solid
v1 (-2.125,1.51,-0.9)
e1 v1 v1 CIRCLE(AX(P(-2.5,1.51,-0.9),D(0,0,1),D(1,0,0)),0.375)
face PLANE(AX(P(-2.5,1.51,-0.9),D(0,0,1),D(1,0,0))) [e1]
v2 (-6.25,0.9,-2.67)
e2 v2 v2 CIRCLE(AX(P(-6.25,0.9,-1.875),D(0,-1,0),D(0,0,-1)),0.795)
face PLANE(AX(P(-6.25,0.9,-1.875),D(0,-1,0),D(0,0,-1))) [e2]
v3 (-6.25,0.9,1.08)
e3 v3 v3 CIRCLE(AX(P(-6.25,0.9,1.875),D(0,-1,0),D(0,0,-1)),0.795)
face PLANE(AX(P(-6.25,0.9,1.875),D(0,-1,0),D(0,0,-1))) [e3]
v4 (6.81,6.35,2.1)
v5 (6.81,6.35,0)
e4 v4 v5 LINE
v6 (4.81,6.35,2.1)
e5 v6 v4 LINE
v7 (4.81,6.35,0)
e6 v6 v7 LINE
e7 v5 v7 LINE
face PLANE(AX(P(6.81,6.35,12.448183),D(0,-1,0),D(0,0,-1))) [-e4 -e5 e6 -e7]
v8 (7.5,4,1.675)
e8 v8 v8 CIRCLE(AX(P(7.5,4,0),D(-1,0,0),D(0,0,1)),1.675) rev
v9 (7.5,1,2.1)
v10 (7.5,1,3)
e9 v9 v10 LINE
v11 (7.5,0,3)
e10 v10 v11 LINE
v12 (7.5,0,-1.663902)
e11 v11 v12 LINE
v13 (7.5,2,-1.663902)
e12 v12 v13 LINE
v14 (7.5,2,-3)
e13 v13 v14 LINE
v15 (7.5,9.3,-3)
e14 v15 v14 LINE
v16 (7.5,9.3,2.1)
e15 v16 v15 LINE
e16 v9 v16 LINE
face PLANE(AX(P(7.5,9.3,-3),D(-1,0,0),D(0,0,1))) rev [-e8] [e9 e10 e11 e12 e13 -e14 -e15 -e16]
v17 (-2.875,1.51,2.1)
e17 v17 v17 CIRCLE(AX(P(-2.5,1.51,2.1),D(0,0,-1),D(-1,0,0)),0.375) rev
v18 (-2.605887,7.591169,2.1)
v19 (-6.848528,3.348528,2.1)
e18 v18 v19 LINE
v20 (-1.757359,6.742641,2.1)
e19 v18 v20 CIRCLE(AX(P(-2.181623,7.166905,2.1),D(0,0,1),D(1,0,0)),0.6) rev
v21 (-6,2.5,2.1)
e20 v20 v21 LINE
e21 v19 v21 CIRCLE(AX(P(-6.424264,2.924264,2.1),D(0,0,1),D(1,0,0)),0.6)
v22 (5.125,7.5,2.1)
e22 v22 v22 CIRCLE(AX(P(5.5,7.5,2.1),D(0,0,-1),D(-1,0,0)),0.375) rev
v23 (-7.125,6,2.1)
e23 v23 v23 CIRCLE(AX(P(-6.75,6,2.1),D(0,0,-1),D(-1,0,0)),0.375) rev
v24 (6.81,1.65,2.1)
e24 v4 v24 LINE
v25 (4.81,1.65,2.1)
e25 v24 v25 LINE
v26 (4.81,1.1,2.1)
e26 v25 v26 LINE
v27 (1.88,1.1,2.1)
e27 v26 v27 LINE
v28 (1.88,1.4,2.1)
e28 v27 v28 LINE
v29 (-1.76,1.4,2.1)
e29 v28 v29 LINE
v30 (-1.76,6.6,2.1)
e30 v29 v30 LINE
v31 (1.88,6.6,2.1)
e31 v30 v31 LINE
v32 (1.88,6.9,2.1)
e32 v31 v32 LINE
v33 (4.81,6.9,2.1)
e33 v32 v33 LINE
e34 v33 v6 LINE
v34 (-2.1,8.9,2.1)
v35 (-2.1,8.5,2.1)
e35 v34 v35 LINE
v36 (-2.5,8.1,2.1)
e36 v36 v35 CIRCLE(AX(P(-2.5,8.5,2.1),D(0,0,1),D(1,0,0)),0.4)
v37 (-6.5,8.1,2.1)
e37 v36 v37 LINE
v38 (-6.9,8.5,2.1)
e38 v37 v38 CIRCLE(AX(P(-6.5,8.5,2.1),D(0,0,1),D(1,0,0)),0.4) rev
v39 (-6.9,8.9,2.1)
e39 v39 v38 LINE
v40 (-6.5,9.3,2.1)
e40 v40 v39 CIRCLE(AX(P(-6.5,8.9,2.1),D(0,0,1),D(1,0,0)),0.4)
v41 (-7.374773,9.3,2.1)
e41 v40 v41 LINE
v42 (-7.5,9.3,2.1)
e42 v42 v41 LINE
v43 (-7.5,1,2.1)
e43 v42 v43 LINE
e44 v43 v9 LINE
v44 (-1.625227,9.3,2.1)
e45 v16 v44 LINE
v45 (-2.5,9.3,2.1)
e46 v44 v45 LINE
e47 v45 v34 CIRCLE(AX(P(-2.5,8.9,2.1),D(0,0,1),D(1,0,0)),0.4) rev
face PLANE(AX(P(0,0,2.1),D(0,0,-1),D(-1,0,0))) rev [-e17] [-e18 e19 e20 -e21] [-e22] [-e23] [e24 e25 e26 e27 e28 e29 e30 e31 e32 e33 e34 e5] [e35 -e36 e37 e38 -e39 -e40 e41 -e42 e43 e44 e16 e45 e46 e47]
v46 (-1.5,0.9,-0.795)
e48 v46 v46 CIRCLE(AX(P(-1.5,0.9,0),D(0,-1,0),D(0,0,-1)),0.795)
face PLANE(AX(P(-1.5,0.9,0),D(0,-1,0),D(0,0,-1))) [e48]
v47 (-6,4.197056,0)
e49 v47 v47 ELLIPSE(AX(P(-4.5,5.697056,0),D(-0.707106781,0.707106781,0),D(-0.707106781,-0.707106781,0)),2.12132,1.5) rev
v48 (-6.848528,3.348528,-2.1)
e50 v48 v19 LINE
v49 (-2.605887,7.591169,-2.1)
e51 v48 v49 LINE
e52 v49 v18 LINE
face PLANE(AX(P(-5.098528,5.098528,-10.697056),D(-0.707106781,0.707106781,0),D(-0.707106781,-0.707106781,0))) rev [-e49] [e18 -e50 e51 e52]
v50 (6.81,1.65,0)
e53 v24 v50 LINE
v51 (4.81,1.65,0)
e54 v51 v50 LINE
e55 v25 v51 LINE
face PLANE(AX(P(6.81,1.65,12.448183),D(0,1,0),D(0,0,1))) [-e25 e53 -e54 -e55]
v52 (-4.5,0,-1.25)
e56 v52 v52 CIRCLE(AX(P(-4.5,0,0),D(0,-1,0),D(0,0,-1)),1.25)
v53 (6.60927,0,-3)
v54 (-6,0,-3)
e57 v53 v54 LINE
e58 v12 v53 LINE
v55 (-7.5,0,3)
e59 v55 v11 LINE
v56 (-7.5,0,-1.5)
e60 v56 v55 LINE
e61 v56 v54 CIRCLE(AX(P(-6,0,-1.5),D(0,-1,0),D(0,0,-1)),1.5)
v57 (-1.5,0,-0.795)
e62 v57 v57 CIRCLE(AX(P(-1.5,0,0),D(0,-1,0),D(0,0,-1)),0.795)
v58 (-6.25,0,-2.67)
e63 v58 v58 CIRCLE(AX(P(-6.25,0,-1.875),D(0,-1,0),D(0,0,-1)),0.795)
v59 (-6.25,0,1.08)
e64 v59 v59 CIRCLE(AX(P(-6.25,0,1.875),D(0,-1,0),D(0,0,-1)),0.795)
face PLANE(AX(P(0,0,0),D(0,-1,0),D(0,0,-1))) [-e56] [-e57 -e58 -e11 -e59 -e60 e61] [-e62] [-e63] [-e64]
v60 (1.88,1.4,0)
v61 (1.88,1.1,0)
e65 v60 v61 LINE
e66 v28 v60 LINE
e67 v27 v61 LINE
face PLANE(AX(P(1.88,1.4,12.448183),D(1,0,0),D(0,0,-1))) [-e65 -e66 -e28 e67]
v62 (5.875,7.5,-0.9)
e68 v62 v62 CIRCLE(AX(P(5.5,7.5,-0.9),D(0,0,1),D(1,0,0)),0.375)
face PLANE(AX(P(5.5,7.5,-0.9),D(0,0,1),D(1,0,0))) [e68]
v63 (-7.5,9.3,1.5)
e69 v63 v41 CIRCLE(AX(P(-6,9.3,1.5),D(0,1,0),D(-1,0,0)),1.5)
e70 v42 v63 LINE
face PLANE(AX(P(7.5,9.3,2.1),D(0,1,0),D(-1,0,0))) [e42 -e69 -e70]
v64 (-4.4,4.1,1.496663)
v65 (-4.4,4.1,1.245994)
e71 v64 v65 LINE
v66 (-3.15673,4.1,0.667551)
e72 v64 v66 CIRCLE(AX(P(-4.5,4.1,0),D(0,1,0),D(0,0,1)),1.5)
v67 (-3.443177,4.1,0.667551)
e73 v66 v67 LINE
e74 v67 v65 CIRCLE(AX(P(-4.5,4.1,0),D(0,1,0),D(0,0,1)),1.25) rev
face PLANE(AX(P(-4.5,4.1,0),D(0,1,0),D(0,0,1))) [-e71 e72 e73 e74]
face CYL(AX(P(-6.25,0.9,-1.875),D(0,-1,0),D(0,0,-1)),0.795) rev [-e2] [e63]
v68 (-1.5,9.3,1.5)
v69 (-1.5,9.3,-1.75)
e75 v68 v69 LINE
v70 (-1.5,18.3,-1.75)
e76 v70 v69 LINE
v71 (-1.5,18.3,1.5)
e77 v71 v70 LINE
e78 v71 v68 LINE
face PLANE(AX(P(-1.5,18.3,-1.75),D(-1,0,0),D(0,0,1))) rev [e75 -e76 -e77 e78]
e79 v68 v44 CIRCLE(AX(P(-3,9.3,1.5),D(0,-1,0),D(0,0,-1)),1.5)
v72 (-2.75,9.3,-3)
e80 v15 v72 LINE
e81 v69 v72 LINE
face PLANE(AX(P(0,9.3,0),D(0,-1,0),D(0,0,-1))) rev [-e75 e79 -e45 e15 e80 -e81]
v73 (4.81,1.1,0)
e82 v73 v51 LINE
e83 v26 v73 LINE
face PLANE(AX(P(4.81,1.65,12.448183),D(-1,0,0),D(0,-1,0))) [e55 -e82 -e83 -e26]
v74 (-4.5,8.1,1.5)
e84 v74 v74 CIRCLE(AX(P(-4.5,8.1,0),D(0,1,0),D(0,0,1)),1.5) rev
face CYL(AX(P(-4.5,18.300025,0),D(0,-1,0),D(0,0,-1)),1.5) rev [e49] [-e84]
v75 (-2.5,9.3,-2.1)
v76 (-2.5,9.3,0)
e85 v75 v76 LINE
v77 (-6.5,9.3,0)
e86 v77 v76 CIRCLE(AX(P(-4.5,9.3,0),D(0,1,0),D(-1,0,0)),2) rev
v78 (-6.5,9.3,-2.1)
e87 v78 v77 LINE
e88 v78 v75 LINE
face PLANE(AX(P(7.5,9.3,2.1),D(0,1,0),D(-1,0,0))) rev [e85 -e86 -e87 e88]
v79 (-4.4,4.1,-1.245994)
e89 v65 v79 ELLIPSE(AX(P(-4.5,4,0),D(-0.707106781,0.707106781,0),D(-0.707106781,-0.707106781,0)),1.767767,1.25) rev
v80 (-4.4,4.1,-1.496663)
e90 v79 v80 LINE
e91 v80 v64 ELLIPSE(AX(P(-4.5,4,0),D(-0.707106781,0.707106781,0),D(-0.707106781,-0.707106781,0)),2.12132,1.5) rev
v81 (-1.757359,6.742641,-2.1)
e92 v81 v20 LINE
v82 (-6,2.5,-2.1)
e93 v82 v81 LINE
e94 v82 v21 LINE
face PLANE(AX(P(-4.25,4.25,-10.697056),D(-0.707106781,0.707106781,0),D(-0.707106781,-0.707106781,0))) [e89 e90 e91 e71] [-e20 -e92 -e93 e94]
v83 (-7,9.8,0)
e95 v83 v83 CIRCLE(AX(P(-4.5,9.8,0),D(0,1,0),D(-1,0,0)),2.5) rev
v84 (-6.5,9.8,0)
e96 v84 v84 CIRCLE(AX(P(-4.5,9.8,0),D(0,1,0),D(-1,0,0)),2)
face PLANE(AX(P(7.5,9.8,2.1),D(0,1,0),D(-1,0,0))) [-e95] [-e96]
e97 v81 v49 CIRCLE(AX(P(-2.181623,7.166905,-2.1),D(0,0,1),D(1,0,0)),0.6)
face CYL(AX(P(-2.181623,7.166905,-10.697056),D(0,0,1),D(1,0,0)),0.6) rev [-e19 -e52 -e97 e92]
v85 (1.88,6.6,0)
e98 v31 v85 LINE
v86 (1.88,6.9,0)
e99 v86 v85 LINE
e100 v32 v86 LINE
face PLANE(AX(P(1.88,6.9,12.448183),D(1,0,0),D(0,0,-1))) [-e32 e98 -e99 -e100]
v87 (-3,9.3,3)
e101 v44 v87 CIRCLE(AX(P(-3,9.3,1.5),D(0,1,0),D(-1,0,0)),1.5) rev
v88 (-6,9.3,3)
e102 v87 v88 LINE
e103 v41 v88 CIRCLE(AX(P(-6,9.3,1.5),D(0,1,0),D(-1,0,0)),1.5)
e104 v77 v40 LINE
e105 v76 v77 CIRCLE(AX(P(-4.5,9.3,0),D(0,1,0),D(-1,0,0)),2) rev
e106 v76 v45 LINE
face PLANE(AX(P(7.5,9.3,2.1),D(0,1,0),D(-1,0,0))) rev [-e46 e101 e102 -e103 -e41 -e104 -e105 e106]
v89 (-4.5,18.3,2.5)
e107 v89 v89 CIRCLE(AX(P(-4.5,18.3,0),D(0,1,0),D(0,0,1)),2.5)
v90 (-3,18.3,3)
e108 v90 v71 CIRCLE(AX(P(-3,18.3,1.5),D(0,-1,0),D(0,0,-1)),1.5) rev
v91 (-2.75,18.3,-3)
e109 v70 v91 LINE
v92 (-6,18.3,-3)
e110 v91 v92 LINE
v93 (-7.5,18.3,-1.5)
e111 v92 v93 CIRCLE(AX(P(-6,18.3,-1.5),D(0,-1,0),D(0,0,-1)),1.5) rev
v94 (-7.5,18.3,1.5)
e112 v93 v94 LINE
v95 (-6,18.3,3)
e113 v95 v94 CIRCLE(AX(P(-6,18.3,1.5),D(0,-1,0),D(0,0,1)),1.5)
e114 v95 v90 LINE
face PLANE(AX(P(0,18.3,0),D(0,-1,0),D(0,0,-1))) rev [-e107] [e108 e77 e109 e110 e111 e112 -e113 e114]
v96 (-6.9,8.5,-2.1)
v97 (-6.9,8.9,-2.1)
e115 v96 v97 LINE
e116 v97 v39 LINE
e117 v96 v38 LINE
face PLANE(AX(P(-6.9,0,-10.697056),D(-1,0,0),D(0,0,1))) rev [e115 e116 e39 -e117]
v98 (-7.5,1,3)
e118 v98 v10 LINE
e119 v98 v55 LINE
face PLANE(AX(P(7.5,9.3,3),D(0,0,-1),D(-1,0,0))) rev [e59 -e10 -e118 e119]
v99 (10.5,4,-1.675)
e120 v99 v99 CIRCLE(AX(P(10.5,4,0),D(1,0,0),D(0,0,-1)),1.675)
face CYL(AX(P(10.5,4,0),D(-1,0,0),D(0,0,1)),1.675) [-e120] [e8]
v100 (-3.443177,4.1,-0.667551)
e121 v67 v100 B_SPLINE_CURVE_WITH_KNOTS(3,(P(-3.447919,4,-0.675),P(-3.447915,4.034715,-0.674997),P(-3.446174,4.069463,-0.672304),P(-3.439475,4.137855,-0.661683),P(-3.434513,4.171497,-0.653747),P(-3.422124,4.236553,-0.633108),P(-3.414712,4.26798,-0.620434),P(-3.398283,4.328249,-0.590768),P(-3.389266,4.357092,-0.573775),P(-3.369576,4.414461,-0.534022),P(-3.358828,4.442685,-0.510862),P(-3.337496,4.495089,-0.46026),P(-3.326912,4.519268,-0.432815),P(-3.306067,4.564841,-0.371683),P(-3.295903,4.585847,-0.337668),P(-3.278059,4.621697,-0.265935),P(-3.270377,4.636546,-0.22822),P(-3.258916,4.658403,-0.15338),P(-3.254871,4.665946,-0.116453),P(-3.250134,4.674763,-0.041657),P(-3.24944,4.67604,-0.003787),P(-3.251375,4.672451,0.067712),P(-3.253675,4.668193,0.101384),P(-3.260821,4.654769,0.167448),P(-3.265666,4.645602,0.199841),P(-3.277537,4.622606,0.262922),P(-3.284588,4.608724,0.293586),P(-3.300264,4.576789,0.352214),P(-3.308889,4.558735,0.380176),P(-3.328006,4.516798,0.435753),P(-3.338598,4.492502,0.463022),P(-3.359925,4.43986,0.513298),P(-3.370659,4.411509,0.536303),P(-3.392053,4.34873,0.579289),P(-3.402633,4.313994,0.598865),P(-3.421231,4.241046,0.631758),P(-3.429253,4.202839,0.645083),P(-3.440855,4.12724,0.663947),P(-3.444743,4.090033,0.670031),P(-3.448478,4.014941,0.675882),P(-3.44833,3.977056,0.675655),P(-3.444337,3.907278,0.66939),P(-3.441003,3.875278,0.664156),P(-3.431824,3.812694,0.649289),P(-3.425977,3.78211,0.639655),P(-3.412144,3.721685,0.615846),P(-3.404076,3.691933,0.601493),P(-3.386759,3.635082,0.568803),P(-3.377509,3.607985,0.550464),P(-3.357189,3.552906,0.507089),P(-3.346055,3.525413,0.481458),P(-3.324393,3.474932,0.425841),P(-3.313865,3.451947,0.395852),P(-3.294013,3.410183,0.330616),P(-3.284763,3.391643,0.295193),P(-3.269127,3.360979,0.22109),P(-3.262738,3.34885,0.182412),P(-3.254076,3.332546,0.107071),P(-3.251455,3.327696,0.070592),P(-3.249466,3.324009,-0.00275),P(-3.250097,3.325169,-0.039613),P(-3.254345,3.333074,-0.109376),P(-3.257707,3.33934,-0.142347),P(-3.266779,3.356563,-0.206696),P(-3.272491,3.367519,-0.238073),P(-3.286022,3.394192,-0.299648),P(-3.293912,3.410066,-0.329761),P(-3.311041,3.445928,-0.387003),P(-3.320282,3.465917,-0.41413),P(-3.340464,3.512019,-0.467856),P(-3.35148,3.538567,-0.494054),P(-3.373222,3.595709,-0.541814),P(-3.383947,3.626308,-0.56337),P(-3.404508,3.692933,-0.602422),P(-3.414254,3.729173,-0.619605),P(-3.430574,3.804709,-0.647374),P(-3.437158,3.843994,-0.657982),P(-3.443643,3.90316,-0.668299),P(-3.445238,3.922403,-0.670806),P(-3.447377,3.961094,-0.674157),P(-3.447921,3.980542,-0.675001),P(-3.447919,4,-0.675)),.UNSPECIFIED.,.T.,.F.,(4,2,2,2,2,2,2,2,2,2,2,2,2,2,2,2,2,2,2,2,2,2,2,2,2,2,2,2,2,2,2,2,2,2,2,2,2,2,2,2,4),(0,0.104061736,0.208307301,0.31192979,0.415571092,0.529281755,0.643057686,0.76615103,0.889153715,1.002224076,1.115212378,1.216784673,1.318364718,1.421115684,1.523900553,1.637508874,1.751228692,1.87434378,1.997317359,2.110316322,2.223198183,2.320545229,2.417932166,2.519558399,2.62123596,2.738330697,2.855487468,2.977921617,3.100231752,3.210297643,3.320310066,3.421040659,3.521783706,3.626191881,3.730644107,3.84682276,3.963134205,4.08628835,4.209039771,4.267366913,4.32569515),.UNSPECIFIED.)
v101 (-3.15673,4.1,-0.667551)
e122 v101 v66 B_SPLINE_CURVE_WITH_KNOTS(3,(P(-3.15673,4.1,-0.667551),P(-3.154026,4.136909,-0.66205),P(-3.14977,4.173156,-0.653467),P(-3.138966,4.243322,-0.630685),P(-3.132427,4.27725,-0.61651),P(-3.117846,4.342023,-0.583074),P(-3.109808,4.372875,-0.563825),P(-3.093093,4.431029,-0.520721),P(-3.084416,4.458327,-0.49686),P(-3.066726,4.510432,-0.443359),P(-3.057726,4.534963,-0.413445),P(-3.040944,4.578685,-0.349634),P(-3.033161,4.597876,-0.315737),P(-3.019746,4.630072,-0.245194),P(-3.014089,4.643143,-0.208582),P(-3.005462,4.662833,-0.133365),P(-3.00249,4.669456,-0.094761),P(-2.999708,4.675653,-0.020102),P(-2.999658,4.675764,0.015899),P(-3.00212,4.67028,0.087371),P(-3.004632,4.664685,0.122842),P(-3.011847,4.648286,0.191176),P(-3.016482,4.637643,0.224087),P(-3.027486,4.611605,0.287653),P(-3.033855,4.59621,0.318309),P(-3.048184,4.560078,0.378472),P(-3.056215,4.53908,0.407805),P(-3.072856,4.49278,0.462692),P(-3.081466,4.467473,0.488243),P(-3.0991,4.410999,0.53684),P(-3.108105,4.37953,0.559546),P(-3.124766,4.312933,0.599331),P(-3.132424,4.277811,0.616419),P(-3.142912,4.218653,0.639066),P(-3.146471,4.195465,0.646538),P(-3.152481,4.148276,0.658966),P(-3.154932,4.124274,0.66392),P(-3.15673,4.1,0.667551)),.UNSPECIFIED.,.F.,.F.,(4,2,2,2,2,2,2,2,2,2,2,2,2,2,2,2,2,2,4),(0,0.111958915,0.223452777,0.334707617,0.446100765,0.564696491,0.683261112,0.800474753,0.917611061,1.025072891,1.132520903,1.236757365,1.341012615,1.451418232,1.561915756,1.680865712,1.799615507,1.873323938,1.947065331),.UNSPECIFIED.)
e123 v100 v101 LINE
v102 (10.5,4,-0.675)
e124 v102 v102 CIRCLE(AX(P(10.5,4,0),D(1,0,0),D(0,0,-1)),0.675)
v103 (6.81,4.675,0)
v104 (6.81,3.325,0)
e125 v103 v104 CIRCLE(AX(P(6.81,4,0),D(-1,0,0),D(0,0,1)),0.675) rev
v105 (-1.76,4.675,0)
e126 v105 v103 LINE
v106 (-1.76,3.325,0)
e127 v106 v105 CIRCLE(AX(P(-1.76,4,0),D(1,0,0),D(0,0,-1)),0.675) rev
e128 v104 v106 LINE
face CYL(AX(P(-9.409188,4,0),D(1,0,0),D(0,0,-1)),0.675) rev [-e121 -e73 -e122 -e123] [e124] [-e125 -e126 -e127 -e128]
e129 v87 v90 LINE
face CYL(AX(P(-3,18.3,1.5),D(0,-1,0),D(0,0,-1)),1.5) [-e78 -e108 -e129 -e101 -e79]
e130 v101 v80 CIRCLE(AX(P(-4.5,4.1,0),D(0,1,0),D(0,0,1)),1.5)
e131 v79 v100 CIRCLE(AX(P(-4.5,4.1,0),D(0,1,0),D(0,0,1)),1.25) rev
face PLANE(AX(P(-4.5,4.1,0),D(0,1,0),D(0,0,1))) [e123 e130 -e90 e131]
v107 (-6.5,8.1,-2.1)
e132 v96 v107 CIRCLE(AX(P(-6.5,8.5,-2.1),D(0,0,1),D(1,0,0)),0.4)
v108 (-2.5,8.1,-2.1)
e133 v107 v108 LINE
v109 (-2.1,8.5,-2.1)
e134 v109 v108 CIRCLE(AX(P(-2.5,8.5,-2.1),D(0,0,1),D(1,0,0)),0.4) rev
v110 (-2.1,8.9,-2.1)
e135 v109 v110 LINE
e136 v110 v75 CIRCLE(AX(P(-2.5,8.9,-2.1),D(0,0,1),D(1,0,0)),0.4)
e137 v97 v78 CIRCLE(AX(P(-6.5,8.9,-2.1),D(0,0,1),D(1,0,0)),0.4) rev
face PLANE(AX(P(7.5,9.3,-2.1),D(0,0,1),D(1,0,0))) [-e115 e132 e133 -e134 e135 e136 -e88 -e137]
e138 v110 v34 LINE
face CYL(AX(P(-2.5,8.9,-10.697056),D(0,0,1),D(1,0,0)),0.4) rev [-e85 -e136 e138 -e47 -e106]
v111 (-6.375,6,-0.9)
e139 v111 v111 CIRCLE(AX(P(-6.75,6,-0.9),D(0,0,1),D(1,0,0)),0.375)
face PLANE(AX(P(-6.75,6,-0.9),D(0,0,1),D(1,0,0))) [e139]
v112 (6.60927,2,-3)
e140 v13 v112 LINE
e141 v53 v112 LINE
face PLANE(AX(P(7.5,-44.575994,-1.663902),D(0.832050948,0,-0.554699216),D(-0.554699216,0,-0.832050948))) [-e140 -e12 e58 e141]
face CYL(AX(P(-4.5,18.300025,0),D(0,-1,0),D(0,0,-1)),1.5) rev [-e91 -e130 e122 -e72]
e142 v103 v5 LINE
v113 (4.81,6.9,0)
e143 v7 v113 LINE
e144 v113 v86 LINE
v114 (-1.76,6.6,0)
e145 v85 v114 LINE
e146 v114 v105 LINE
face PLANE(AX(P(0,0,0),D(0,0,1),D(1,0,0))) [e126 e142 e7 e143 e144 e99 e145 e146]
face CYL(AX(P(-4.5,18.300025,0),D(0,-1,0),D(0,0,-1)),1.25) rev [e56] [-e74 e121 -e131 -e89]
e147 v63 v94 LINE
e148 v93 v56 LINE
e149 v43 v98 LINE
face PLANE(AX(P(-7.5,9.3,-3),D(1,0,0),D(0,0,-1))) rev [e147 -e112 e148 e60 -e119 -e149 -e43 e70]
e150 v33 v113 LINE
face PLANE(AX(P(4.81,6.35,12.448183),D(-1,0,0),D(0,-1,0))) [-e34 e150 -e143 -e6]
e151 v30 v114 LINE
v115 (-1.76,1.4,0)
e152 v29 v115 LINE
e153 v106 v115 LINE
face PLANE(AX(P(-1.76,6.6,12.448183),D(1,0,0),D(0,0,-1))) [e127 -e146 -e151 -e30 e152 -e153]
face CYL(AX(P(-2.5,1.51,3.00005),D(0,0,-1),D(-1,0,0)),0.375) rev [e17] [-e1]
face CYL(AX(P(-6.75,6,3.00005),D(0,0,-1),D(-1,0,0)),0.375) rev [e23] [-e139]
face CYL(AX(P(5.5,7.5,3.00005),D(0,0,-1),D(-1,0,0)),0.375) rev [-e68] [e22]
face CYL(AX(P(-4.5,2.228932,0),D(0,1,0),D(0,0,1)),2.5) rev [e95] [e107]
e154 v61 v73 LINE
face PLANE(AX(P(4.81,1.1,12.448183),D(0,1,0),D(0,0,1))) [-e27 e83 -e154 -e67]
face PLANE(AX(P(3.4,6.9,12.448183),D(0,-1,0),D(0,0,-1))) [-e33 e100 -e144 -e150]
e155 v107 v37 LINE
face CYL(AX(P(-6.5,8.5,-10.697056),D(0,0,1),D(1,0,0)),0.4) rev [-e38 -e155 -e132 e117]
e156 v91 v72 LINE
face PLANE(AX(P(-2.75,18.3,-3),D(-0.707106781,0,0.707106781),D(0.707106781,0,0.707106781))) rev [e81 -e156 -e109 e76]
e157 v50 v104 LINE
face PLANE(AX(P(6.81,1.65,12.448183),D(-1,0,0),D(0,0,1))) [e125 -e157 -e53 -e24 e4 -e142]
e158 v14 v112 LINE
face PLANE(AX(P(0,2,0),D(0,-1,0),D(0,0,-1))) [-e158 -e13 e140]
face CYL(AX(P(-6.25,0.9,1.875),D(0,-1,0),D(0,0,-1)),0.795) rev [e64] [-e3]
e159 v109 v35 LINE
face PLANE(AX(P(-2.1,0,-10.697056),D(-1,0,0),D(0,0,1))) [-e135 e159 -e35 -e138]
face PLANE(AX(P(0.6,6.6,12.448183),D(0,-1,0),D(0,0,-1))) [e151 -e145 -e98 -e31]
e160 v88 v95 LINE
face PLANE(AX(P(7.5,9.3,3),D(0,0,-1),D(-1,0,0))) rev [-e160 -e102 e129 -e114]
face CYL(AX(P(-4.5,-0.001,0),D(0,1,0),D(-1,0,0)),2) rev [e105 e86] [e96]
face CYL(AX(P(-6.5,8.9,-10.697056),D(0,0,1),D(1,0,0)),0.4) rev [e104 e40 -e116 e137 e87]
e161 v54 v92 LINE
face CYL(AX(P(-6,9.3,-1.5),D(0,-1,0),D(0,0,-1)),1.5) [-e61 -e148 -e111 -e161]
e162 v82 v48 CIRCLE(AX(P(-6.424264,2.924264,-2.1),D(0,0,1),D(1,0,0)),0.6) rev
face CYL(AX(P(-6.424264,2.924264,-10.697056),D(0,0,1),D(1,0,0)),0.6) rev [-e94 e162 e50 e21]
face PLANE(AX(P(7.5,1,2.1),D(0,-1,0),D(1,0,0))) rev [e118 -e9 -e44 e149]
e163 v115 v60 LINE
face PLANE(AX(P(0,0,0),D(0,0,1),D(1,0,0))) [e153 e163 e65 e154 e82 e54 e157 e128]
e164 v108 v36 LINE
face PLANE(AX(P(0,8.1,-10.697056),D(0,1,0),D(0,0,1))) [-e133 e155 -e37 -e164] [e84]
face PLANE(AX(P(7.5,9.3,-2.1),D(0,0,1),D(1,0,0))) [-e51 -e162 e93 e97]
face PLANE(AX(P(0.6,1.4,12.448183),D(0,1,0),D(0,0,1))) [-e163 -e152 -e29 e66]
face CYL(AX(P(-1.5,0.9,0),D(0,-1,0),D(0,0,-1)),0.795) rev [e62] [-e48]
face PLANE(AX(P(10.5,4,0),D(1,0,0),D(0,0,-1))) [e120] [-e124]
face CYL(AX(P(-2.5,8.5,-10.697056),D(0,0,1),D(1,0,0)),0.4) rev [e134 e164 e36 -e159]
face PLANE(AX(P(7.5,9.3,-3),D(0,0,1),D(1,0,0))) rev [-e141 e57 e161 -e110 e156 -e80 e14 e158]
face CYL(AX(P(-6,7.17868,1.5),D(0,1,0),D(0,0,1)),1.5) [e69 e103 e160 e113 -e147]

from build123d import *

# Parameters (mm, degrees)
SKETCH1_W                       = 15
SKETCH1_H                       = 6
MAIN_BODY_EXT_DEPTH             = 9.3
EMISSION_PATH_EXT_DEPTH         = 9
SKETCH3_R                       = 1.25
EMISSION_AND_GRIN_CUT_DEPTH     = 21.003499694
FIBER_FERRULE_CUT_REACH         = 25.851
FIBER_FERRULE_CUT_END_RADIUS    = 1.25
SKETCH4_R                       = 0.675
FIBER_START                     = 3
SKETCH41_R                      = 1.675
SKETCH41_R_2                    = 0.675
FIBER_FERRULE_PORT_EXT_DEPTH    = 3
SKETCH5_W                       = 15
SKETCH5_H                       = 8.3
FILTERSET_CUT1_DEPTH            = 0.9
FILTERSET_CUT2_DEPTH            = 4.2
SKETCH10_R                      = 2.5
EMISSION_LENS_CUT_DEPTH         = 8.5
EXCITATION_PATHWAY_CUT_2_DEPTH  = 2.1
SKETCH15_R                      = 0.795
MAGNETS_CUT_DEPTH               = 0.9
SCREW_HOLES_CUT_DEPTH           = 22.705990005
SCREW_HOLES_CUT_DEPTH_BACK      = 3
SKETCH18_R                      = 0.375
EXTERNAL_FILLET_1_R             = 1.5
EMISSION_PATHWAY_CUT_DEPTH      = 15.942891357
EMISSION_PATHWAY_CUT_DEPTH_BACK = 4
SKETCH28_R                      = 1.5
CUT_EXTRUDE16_DEPTH             = 9
CUT_EXTRUDE17_REACH             = 16.673
SKETCH37_R                      = 2
BASEPLATE_NOTCH_CUT_DEPTH       = 22.310560811
BASEPLATE_NOTCH_CUT_DEPTH_BACK  = 2


with BuildPart() as part:
    # Sketch1 → Main Body Ext (new body)
    with BuildSketch(Plane(origin=(0, 0, 0), x_dir=(1, 0, 0), z_dir=(0, 1, 0))):
        Rectangle(SKETCH1_W, SKETCH1_H)
    extrude(amount=MAIN_BODY_EXT_DEPTH)

    # Sketch8 → Emission Path Ext (add)
    with BuildSketch(Plane(origin=(0, 9.3, 0), x_dir=(1, 0, 0), z_dir=(0, 1, 0))):
        Polygon((-2.75, 3), (-1.5, 1.75), (-1.5, -3), (-7.5, -3), (-7.5, 3), align=None)
    extrude(amount=EMISSION_PATH_EXT_DEPTH)

    # Sketch3 → Emission and Grin Cut (cut, through all)
    with BuildSketch(Plane.XZ):
        with Locations(Location((-4.5, 0, 0), (0, 0, 270))):
            Circle(SKETCH3_R)
    extrude(amount=-EMISSION_AND_GRIN_CUT_DEPTH, mode=Mode.SUBTRACT)

    # Fiber Ferrule Cut: up to this cylinder (the profile starts outside it)
    fiber_ferrule_cut_end = Plane(origin=(-4.5, 4, 0), z_dir=(0, -1, 0)) * Cylinder(FIBER_FERRULE_CUT_END_RADIUS, 55.202, mode=Mode.PRIVATE)
    # Sketch4 → Fiber Ferrule Cut (cut, up to the surface)
    with BuildSketch(Plane(origin=(7.5, 0, 0), x_dir=(0, 0, -1), z_dir=(1, 0, 0)), mode=Mode.PRIVATE) as fiber_ferrule_cut_sk1:
        with Locations((0, 4)):
            Circle(SKETCH4_R)
    fiber_ferrule_cut_tool1 = extrude(fiber_ferrule_cut_sk1.sketch, amount=-FIBER_FERRULE_CUT_REACH, mode=Mode.PRIVATE) - fiber_ferrule_cut_end
    add(fiber_ferrule_cut_tool1.solids().sort_by_distance((7.5, 4, 0))[0], mode=Mode.SUBTRACT)

    # Sketch41 → Fiber Ferrule Port Ext (add)
    with BuildSketch(Plane(origin=(7.5, 0, 0), x_dir=(0, 0, -1), z_dir=(1, 0, 0)).offset(FIBER_START)):
        with Locations(Location((0, 4, 0), (0, 0, 180))):
            Circle(SKETCH41_R)
        with Locations((0, 4)):
            Circle(SKETCH41_R_2, mode=Mode.SUBTRACT)
    extrude(amount=-FIBER_FERRULE_PORT_EXT_DEPTH)

    # Sketch5 → FilterSet Cut1 (cut)
    with BuildSketch(Plane.XY.offset(3)):
        with Locations((0, 5.15)):
            Rectangle(SKETCH5_W, SKETCH5_H)
    extrude(amount=-FILTERSET_CUT1_DEPTH, mode=Mode.SUBTRACT)

    # Sketch6 → FilterSet Cut2 (cut)
    with BuildSketch(Plane.XY.offset(2.1)):
        with BuildLine():
            Line((-2.60588745, 7.591168825), (-6.848528137, 3.348528137))
            ThreePointArc((-6.848528137, 3.348528137), (-6.848528137, 2.5), (-6, 2.5))
            Line((-6, 2.5), (-1.757359313, 6.742640687))
            ThreePointArc((-1.757359313, 6.742640687), (-1.757359313, 7.591168825), (-2.60588745, 7.591168825))
        make_face()
        with BuildLine():
            ThreePointArc((-6.5, 9.3), (-6.782842712, 9.182842712), (-6.9, 8.9))
            Line((-6.9, 8.9), (-6.9, 8.5))
            ThreePointArc((-6.9, 8.5), (-6.782842712, 8.217157288), (-6.5, 8.1))
            Line((-6.5, 8.1), (-2.5, 8.1))
            ThreePointArc((-2.5, 8.1), (-2.217157288, 8.217157288), (-2.1, 8.5))
            Line((-2.1, 8.5), (-2.1, 8.9))
            ThreePointArc((-2.1, 8.9), (-2.217157288, 9.182842712), (-2.5, 9.3))
            Line((-2.5, 9.3), (-6.5, 9.3))
        make_face()
    extrude(amount=-FILTERSET_CUT2_DEPTH, mode=Mode.SUBTRACT)

    # Sketch10 → Emission Lens Cut (cut)
    with BuildSketch(Plane(origin=(0, 18.3, 0), x_dir=(1, 0, 0), z_dir=(0, 1, 0))):
        with Locations(Location((-4.5, 0, 0), (0, 0, 270))):
            Circle(SKETCH10_R)
    extrude(amount=-EMISSION_LENS_CUT_DEPTH, mode=Mode.SUBTRACT)

    # Sketch44 → Excitation Pathway Cut 2 (cut)
    with BuildSketch(Plane.XY):
        Polygon((3.4, 1.1), (1.88, 1.1), (1.88, 1.4), (0.6, 1.4), (-0.9, 1.4), (-1.76, 1.4), (-1.76, 6.6), (-0.9, 6.6), (0.6, 6.6), (1.88, 6.6), (1.88, 6.9), (3.4, 6.9), (4.81, 6.9), (4.81, 6.35), (6.81, 6.35), (6.81, 1.65), (4.81, 1.65), (4.81, 1.1), align=None)
    extrude(amount=EXCITATION_PATHWAY_CUT_2_DEPTH, mode=Mode.SUBTRACT)

    # Sketch15 → Magnets Cut (cut)
    with BuildSketch(Plane.XZ):
        with Locations(Location((-6.25, -1.875, 0), (0, 0, 270))):
            Circle(SKETCH15_R)
        with Locations(Location((-6.25, 1.875, 0), (0, 0, 270))):
            Circle(SKETCH15_R)
        with Locations(Location((-1.5, 0, 0), (0, 0, 270))):
            Circle(SKETCH15_R)
    extrude(amount=-MAGNETS_CUT_DEPTH, mode=Mode.SUBTRACT)

    # Sketch18 → Screw Holes Cut (cut, two sides: drawn at the far end of the back side and taken through both)
    with BuildSketch(Plane.XY.offset(2.1).offset(-SCREW_HOLES_CUT_DEPTH_BACK)):
        with Locations(Location((-6.75, 6, 0), (0, 0, 180))):
            Circle(SKETCH18_R)
        with Locations(Location((5.5, 7.5, 0), (0, 0, 180))):
            Circle(SKETCH18_R)
        with Locations(Location((-2.5, 1.51, 0), (0, 0, 180))):
            Circle(SKETCH18_R)
    extrude(amount=SCREW_HOLES_CUT_DEPTH + SCREW_HOLES_CUT_DEPTH_BACK, mode=Mode.SUBTRACT)

    # External Fillet 1
    # the kernel refuses this fillet: 1.5 mm, written as the material it takes off along each edge
    with BuildSketch(Plane(origin=(-7.5, -3.75, -3), x_dir=(1, 0, 0), z_dir=(0, 1, 0))) as external_fillet_1_piece_1:
        with BuildLine():
            CenterArc((EXTERNAL_FILLET_1_R, -EXTERNAL_FILLET_1_R), EXTERNAL_FILLET_1_R, 90, 90)
            Line((0, -EXTERNAL_FILLET_1_R), (0, 0))
            Line((0, 0), (EXTERNAL_FILLET_1_R, 0))
        make_face()
    extrude(amount=25.8, mode=Mode.SUBTRACT)
    with BuildSketch(Plane(origin=(-1.5, 9.3, 3), x_dir=(0, 0, -1), z_dir=(0, 1, 0))) as external_fillet_1_piece_2:
        with BuildLine():
            CenterArc((EXTERNAL_FILLET_1_R, EXTERNAL_FILLET_1_R), EXTERNAL_FILLET_1_R, 180, 90)
            Line((0, EXTERNAL_FILLET_1_R), (0, 0))
            Line((0, 0), (EXTERNAL_FILLET_1_R, 0))
        make_face()
    extrude(amount=12.75, mode=Mode.SUBTRACT)

    # Sketch28 → Emission Pathway Cut (cut, two sides: drawn at the far end of the back side and taken through both)
    with BuildSketch(Plane(origin=(0, 8.1, 0), x_dir=(1, 0, 0), z_dir=(0, 1, 0)).offset(-EMISSION_PATHWAY_CUT_DEPTH_BACK)):
        with Locations(Location((-4.5, 0, 0), (0, 0, 180))):
            Circle(SKETCH28_R)
    extrude(amount=EMISSION_PATHWAY_CUT_DEPTH + EMISSION_PATHWAY_CUT_DEPTH_BACK, mode=Mode.SUBTRACT)

    # Sketch36 → Cut-Extrude16 (cut)
    with BuildSketch(Plane(origin=(0, 18.3, 0), x_dir=(1, 0, 0), z_dir=(0, 1, 0))):
        with BuildLine():
            Line((-7.5, -1.5), (-7.5, -3))
            Line((-7.5, -3), (-6, -3))
            ThreePointArc((-6, -3), (-7.060660172, -2.560660172), (-7.5, -1.5))
        make_face()
    extrude(amount=-CUT_EXTRUDE16_DEPTH, mode=Mode.SUBTRACT)

    # Sketch37 → Cut-Extrude17 (cut, up to next)
    with BuildSketch(Plane(origin=(0, 9.8, 0), x_dir=(1, 0, 0), z_dir=(0, 1, 0)), mode=Mode.PRIVATE) as cut_extrude17_sk1:
        with Locations(Location((-4.5, 0, 0), (0, 0, 180))):
            Circle(SKETCH37_R)
    cut_extrude17_tool1 = extrude(cut_extrude17_sk1.sketch, amount=-CUT_EXTRUDE17_REACH, mode=Mode.PRIVATE) & part.part
    add(cut_extrude17_tool1.solids().sort_by_distance((-4.5, 9.8, 0))[0], mode=Mode.SUBTRACT)

    # Sketch45 → Baseplate Notch Cut (cut, two sides: drawn at the far end of the back side and taken through both)
    with BuildSketch(Plane.XZ.offset(-BASEPLATE_NOTCH_CUT_DEPTH_BACK)):
        Polygon((30.47380128, 32.796887648), (7.5, -1.663902268), (6.609270453, -3), (-16.364530827, -37.460789916), (52.557049005, -83.408392475), (99.395381111, -13.150714911), align=None)
    extrude(amount=BASEPLATE_NOTCH_CUT_DEPTH + BASEPLATE_NOTCH_CUT_DEPTH_BACK, mode=Mode.SUBTRACT)


solid = part.part
